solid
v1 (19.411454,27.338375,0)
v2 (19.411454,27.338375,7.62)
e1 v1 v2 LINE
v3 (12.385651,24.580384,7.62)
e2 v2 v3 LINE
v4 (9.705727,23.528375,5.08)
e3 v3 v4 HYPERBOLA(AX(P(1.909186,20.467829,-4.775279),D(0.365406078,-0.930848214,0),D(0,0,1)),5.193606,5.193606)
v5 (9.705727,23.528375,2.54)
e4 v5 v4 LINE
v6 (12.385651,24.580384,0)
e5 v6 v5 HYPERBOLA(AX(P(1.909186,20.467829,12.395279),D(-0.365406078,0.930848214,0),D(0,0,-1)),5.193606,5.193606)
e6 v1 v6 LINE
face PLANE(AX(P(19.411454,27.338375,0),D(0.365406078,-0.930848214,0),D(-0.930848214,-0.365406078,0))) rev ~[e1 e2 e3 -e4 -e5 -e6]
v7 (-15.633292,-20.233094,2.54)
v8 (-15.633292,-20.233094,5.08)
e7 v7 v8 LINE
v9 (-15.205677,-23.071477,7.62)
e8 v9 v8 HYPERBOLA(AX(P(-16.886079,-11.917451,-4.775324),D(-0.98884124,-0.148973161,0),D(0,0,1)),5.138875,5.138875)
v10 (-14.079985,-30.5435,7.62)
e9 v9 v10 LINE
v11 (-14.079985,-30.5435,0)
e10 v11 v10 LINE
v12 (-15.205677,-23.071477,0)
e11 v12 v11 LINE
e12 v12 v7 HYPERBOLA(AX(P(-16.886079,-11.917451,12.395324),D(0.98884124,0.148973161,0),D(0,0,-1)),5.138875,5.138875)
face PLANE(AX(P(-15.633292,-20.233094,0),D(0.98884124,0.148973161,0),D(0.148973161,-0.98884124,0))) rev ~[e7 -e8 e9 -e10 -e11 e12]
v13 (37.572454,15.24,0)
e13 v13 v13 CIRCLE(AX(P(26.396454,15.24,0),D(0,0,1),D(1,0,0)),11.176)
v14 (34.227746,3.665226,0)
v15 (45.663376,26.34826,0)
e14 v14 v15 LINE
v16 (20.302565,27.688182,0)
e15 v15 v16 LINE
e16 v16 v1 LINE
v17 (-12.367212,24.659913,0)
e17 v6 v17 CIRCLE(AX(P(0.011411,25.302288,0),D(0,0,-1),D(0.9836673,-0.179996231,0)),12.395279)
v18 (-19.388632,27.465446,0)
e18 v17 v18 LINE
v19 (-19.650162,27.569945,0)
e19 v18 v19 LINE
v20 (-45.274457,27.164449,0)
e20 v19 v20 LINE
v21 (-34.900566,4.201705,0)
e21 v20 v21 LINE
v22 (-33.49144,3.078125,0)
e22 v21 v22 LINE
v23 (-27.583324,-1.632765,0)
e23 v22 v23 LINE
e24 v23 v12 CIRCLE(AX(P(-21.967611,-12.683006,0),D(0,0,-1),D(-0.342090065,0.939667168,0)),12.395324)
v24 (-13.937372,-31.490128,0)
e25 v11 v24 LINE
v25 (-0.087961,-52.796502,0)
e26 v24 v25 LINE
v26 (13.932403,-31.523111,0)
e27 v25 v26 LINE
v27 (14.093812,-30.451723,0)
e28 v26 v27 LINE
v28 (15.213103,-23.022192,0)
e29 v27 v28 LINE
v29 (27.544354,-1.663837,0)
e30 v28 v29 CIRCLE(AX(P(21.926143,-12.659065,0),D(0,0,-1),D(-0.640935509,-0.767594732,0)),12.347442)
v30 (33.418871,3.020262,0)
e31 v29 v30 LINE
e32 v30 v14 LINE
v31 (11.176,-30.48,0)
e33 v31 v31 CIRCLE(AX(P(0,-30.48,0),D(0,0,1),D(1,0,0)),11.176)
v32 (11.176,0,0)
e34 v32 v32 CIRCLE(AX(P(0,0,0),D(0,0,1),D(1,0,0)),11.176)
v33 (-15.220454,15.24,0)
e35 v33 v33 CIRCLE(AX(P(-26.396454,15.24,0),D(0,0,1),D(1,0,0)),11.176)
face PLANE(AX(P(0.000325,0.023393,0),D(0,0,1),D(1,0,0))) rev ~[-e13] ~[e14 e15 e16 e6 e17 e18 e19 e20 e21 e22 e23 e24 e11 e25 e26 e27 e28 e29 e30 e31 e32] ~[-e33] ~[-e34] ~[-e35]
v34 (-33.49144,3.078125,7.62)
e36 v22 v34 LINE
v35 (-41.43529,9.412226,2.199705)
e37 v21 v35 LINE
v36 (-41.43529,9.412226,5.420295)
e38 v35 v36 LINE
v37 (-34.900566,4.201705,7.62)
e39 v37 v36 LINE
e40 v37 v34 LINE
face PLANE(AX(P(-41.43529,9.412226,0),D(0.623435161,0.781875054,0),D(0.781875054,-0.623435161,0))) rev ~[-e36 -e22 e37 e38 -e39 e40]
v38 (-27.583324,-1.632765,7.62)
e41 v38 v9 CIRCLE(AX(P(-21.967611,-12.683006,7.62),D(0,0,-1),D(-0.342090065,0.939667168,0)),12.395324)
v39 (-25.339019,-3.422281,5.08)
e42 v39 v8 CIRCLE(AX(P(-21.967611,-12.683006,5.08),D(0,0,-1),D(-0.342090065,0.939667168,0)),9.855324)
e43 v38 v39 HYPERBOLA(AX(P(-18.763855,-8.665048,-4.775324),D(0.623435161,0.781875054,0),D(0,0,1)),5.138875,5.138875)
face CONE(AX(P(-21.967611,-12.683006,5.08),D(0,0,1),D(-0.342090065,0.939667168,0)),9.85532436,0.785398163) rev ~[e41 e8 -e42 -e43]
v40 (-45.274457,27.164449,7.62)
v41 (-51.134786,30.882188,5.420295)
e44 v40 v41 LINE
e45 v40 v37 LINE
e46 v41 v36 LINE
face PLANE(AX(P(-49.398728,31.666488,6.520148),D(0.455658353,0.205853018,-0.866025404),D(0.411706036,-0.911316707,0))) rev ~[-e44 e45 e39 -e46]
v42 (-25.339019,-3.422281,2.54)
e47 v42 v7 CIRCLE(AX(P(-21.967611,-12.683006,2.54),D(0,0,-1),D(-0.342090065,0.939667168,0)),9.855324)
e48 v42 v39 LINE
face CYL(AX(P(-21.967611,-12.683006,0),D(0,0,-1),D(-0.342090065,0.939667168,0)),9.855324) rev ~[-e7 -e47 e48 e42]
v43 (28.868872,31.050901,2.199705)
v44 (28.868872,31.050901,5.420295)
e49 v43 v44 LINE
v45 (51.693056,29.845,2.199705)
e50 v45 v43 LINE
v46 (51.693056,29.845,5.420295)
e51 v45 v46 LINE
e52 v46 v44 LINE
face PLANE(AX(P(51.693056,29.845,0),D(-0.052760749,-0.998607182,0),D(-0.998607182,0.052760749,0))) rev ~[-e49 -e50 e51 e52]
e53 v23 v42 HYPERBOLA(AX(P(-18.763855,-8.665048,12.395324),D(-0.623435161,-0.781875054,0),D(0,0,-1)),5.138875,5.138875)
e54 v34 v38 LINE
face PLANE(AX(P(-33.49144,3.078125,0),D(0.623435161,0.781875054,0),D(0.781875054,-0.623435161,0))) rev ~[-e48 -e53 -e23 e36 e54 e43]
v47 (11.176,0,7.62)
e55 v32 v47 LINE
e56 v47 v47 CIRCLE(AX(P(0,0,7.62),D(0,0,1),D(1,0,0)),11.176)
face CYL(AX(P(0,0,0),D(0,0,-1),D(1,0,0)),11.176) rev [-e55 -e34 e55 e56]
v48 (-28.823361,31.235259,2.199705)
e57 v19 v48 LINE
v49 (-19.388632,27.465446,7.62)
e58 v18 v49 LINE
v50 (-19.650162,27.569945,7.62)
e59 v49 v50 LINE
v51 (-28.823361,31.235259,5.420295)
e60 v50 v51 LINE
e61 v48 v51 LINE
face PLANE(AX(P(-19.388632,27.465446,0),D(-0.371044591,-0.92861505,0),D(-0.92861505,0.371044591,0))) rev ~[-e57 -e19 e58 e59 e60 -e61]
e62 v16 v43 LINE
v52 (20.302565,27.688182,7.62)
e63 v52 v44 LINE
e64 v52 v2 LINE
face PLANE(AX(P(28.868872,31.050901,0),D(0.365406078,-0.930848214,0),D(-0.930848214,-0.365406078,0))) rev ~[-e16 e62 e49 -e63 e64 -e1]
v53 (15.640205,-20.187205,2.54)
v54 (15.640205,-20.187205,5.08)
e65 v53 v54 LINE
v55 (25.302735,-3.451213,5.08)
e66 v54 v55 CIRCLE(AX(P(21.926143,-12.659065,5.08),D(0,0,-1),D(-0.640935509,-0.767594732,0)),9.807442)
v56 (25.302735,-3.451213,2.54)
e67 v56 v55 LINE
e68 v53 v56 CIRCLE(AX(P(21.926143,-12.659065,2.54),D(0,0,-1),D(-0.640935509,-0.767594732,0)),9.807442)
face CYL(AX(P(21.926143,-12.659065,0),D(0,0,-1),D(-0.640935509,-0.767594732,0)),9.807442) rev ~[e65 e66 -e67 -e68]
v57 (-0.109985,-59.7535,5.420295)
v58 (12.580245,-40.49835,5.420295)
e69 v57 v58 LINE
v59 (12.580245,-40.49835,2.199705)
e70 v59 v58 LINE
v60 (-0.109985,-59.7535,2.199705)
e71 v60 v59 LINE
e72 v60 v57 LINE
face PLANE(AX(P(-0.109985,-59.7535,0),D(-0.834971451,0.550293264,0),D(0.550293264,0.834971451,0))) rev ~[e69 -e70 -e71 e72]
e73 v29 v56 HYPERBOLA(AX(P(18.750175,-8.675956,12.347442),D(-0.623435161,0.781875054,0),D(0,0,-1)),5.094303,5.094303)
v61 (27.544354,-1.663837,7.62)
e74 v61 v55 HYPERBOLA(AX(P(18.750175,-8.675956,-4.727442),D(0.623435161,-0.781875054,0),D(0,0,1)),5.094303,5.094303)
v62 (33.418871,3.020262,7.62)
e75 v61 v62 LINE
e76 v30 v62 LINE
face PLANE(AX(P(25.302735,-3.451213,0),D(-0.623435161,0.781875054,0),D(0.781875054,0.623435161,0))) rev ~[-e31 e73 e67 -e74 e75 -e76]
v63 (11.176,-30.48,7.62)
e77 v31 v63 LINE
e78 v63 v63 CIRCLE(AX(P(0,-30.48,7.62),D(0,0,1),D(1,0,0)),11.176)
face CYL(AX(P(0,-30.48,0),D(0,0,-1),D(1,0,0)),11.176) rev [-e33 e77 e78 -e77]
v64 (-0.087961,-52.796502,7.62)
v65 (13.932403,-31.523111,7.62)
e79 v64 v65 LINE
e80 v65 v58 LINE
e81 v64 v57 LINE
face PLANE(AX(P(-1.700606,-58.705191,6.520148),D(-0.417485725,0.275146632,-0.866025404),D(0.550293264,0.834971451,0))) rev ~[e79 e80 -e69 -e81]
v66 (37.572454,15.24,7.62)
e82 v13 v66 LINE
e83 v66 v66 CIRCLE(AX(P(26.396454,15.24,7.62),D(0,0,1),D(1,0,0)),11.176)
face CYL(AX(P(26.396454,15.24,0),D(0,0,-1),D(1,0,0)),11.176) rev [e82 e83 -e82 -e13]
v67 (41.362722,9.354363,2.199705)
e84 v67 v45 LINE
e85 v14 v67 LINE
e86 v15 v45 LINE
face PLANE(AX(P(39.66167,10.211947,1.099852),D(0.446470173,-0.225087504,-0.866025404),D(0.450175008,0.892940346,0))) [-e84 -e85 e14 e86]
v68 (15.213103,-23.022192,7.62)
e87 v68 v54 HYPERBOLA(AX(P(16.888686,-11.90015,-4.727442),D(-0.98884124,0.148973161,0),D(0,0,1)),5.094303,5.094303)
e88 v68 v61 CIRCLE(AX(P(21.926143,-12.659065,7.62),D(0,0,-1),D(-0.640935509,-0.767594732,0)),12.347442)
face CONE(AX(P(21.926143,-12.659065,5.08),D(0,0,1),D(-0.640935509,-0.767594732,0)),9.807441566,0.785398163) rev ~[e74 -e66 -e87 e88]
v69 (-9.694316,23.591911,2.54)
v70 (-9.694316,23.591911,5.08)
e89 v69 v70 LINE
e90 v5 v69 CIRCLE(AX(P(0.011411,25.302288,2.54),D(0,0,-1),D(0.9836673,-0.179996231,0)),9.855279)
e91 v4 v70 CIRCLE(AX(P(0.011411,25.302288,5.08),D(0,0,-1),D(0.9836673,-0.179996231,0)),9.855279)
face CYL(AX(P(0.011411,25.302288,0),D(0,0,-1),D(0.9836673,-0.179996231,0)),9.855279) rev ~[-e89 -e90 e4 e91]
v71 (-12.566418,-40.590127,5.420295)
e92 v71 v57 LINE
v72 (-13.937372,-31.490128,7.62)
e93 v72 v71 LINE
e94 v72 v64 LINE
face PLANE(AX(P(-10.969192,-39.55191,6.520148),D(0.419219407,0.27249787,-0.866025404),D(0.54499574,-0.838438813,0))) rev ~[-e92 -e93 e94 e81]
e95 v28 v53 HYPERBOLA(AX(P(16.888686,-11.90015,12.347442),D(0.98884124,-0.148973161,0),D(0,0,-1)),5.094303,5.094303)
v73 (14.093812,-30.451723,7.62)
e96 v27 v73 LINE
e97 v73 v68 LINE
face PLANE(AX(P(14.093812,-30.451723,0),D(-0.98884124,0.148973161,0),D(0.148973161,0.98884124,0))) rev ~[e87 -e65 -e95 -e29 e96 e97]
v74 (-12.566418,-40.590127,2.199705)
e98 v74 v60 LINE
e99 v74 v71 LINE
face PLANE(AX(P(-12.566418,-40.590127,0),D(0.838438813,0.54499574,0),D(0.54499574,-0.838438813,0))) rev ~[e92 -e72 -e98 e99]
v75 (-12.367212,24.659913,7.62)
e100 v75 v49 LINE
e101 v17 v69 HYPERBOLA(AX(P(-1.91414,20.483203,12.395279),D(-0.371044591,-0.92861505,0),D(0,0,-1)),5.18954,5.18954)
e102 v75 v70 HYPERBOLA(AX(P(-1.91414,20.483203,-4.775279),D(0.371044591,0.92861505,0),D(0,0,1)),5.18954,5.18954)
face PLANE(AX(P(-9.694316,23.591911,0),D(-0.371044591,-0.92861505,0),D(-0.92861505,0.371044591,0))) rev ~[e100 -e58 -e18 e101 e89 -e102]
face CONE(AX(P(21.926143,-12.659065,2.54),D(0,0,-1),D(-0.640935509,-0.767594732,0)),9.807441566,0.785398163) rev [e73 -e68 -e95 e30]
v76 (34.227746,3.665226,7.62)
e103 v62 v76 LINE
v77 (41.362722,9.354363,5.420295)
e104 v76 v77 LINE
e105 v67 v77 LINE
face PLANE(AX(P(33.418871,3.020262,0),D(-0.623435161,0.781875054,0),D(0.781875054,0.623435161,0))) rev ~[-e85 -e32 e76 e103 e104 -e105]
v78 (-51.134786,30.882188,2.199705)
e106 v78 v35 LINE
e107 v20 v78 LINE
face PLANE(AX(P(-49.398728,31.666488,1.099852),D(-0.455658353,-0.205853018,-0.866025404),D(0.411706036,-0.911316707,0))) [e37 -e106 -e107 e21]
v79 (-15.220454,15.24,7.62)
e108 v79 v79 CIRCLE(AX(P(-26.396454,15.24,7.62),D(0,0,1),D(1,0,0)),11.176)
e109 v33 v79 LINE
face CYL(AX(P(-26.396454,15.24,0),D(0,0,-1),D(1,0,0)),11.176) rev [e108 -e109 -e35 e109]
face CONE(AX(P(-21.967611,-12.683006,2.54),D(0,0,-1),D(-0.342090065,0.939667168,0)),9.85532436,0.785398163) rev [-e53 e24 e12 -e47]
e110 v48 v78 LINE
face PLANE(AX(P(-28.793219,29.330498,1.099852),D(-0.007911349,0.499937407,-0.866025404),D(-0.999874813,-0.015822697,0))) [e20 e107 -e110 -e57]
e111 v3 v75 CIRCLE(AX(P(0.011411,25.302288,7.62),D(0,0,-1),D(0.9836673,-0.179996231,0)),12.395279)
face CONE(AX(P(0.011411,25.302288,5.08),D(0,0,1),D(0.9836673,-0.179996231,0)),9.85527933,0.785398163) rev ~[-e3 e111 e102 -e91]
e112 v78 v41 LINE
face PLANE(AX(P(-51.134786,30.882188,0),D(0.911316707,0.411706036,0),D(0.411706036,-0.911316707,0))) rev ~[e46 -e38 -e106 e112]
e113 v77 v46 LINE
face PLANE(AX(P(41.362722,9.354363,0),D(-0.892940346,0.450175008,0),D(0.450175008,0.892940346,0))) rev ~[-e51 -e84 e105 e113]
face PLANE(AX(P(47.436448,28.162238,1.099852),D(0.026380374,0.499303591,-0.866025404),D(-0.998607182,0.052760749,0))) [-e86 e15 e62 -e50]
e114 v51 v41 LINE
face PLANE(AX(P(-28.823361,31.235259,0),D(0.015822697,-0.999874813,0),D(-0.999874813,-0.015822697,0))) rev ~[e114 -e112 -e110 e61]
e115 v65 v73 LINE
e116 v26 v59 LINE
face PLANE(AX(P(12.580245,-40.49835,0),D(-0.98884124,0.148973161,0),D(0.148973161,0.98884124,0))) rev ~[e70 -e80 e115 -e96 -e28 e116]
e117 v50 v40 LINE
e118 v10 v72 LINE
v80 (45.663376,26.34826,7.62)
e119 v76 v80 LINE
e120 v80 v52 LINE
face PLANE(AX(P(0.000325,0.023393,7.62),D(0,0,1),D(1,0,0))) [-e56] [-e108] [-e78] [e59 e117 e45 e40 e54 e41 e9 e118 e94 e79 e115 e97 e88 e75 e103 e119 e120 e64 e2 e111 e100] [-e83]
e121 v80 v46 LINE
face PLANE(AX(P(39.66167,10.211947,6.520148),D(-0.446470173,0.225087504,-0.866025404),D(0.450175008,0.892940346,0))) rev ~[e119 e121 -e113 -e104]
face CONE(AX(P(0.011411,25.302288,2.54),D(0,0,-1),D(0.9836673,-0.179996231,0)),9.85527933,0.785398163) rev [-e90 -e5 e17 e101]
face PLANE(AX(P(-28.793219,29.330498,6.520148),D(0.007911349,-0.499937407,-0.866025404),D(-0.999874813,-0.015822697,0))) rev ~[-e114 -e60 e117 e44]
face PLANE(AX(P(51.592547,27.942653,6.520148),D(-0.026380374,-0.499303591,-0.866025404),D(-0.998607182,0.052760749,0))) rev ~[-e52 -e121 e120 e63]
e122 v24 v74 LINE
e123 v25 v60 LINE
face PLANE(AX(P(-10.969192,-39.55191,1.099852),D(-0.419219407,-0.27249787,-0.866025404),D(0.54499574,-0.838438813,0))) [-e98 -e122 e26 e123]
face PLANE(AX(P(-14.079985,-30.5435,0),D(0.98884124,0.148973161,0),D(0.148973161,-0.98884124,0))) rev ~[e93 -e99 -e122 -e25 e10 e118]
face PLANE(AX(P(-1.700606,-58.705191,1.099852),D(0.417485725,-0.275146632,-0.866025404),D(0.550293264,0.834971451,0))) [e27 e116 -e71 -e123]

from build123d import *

# Parameters (mm, degrees)
F0_R       = 11.176
F1_DEPTH   = 7.62
F2_SIZE2   = 2.1997045256
F2_SIZE    = 3.81
F2_2_SIZE2 = 2.1997045256
F2_2_SIZE  = 3.81
F3_SIZE2   = 2.1997045256
F3_SIZE    = 3.81
F4_SIZE    = 2.54


# Not quite as in the source:
# - a feature names something its author has since deleted; it is built from what else it names


with BuildPart() as f1:
    # F0 (on Top) → F1 (new body)
    with BuildSketch(Plane.XY):
        with BuildLine():
            ThreePointArc((9.7057271537, 23.5283748909), (-0.0208649872, 15.4470615517), (-9.6943160077, 23.5919105566))
            Line((-9.6943160077, 23.5919105566), (-19.3886320155, 27.4654462223))
            Line((-19.3886320155, 27.4654462223), (-28.8233609262, 31.2352592656))
            Line((-28.8233609262, 31.2352592656), (-51.1347862104, 30.8821881406))
            Line((-51.1347862104, 30.8821881406), (-41.4352900784, 9.4122263494))
            Line((-41.4352900784, 9.4122263494), (-33.4914395336, 3.0781251091))
            Line((-33.4914395336, 3.0781251091), (-25.3390191684, -3.4222811682))
            ThreePointArc((-25.3390191684, -3.4222811682), (-13.4326493579, -7.7553437227), (-15.6332920147, -20.2330937227))
            Line((-15.6332920147, -20.2330937227), (-14.0799852263, -30.5435))
            Line((-14.0799852263, -30.5435), (-12.5664179144, -40.5901269958))
            Line((-12.5664179144, -40.5901269958), (-0.1099852263, -59.7535))
            Line((-0.1099852263, -59.7535), (12.5802445818, -40.4983495315))
            Line((12.5802445818, -40.4983495315), (14.0938118937, -30.4517225357))
            Line((14.0938118937, -30.4517225357), (15.6402053484, -20.1872049906))
            ThreePointArc((15.6402053484, -20.1872049906), (13.4326493579, -7.7553437227), (25.3027350274, -3.4512126568))
            Line((25.3027350274, -3.4512126568), (33.4188712518, 3.0202621318))
            Line((33.4188712518, 3.0202621318), (41.3627217965, 9.3543633721))
            Line((41.3627217965, 9.3543633721), (51.6930563519, 29.845))
            Line((51.6930563519, 29.845), (28.868872164, 31.0509006464))
            Line((28.868872164, 31.0509006464), (19.4114543073, 27.3383748909))
            Line((19.4114543073, 27.3383748909), (9.7057271537, 23.5283748909))
        make_face()
        with Locations((0, -30.48)):
            Circle(F0_R, mode=Mode.SUBTRACT)
        Circle(F0_R, mode=Mode.SUBTRACT)
        with Locations((-26.3964543073, 15.24)):
            Circle(F0_R, mode=Mode.SUBTRACT)
        with Locations((26.3964543073, 15.24)):
            Circle(F0_R, mode=Mode.SUBTRACT)
    extrude(amount=F1_DEPTH)

    # F2
    f2_edges = [f1.edges().sort_by_distance(p)[0] for p in [
        (-46.285038, 20.147207, 7.62),
        (-39.979074, 31.058724, 7.62),
        (40.280964, 30.44795, 7.62),
        (46.527889, 19.599682, 7.62),
        (6.23513, -50.125925, 7.62),
        (-6.338202, -50.171813, 7.62),
    ]]
    f2_side = f1.faces().sort_by_distance((19.789019, 26.011541, 7.62))[0]
    chamfer(f2_edges, length=F2_SIZE, length2=F2_SIZE2, reference=f2_side)

    # F2#2
    f2_2_edges = [f1.edges().sort_by_distance(p)[0] for p in [
        (-46.285038, 20.147207, 0),
        (46.527889, 19.599682, 0),
        (-39.979074, 31.058724, 0),
    ]]
    f2_2_side = f1.faces().sort_by_distance((19.789019, 26.011541, 0))[0]
    chamfer(f2_2_edges, length=F2_2_SIZE, length2=F2_2_SIZE2, reference=f2_2_side)

    # F3
    f3_edges = [f1.edges().sort_by_distance(p)[0] for p in [
        (-6.338202, -50.171813, 0),
        (6.23513, -50.125925, 0),
        (38.202915, 30.557743, 0),
    ]]
    f3_side = f1.faces().sort_by_distance((-15.154017, 24.375179, 0))[0]
    chamfer(f3_edges, length=F3_SIZE, length2=F3_SIZE2, reference=f3_side)

    # F4
    f4_edges = [f1.edges().sort_by_distance(p)[0] for p in [
        (-0.020865, 15.447062, 7.62),
        (13.432649, -7.755344, 7.62),
        (-13.432649, -7.755344, 7.62),
        (-13.432649, -7.755344, 0),
        (-0.020865, 15.447062, 0),
        (13.432649, -7.755344, 0),
    ]]
    chamfer(f4_edges, length=F4_SIZE)


solid = f1.part
